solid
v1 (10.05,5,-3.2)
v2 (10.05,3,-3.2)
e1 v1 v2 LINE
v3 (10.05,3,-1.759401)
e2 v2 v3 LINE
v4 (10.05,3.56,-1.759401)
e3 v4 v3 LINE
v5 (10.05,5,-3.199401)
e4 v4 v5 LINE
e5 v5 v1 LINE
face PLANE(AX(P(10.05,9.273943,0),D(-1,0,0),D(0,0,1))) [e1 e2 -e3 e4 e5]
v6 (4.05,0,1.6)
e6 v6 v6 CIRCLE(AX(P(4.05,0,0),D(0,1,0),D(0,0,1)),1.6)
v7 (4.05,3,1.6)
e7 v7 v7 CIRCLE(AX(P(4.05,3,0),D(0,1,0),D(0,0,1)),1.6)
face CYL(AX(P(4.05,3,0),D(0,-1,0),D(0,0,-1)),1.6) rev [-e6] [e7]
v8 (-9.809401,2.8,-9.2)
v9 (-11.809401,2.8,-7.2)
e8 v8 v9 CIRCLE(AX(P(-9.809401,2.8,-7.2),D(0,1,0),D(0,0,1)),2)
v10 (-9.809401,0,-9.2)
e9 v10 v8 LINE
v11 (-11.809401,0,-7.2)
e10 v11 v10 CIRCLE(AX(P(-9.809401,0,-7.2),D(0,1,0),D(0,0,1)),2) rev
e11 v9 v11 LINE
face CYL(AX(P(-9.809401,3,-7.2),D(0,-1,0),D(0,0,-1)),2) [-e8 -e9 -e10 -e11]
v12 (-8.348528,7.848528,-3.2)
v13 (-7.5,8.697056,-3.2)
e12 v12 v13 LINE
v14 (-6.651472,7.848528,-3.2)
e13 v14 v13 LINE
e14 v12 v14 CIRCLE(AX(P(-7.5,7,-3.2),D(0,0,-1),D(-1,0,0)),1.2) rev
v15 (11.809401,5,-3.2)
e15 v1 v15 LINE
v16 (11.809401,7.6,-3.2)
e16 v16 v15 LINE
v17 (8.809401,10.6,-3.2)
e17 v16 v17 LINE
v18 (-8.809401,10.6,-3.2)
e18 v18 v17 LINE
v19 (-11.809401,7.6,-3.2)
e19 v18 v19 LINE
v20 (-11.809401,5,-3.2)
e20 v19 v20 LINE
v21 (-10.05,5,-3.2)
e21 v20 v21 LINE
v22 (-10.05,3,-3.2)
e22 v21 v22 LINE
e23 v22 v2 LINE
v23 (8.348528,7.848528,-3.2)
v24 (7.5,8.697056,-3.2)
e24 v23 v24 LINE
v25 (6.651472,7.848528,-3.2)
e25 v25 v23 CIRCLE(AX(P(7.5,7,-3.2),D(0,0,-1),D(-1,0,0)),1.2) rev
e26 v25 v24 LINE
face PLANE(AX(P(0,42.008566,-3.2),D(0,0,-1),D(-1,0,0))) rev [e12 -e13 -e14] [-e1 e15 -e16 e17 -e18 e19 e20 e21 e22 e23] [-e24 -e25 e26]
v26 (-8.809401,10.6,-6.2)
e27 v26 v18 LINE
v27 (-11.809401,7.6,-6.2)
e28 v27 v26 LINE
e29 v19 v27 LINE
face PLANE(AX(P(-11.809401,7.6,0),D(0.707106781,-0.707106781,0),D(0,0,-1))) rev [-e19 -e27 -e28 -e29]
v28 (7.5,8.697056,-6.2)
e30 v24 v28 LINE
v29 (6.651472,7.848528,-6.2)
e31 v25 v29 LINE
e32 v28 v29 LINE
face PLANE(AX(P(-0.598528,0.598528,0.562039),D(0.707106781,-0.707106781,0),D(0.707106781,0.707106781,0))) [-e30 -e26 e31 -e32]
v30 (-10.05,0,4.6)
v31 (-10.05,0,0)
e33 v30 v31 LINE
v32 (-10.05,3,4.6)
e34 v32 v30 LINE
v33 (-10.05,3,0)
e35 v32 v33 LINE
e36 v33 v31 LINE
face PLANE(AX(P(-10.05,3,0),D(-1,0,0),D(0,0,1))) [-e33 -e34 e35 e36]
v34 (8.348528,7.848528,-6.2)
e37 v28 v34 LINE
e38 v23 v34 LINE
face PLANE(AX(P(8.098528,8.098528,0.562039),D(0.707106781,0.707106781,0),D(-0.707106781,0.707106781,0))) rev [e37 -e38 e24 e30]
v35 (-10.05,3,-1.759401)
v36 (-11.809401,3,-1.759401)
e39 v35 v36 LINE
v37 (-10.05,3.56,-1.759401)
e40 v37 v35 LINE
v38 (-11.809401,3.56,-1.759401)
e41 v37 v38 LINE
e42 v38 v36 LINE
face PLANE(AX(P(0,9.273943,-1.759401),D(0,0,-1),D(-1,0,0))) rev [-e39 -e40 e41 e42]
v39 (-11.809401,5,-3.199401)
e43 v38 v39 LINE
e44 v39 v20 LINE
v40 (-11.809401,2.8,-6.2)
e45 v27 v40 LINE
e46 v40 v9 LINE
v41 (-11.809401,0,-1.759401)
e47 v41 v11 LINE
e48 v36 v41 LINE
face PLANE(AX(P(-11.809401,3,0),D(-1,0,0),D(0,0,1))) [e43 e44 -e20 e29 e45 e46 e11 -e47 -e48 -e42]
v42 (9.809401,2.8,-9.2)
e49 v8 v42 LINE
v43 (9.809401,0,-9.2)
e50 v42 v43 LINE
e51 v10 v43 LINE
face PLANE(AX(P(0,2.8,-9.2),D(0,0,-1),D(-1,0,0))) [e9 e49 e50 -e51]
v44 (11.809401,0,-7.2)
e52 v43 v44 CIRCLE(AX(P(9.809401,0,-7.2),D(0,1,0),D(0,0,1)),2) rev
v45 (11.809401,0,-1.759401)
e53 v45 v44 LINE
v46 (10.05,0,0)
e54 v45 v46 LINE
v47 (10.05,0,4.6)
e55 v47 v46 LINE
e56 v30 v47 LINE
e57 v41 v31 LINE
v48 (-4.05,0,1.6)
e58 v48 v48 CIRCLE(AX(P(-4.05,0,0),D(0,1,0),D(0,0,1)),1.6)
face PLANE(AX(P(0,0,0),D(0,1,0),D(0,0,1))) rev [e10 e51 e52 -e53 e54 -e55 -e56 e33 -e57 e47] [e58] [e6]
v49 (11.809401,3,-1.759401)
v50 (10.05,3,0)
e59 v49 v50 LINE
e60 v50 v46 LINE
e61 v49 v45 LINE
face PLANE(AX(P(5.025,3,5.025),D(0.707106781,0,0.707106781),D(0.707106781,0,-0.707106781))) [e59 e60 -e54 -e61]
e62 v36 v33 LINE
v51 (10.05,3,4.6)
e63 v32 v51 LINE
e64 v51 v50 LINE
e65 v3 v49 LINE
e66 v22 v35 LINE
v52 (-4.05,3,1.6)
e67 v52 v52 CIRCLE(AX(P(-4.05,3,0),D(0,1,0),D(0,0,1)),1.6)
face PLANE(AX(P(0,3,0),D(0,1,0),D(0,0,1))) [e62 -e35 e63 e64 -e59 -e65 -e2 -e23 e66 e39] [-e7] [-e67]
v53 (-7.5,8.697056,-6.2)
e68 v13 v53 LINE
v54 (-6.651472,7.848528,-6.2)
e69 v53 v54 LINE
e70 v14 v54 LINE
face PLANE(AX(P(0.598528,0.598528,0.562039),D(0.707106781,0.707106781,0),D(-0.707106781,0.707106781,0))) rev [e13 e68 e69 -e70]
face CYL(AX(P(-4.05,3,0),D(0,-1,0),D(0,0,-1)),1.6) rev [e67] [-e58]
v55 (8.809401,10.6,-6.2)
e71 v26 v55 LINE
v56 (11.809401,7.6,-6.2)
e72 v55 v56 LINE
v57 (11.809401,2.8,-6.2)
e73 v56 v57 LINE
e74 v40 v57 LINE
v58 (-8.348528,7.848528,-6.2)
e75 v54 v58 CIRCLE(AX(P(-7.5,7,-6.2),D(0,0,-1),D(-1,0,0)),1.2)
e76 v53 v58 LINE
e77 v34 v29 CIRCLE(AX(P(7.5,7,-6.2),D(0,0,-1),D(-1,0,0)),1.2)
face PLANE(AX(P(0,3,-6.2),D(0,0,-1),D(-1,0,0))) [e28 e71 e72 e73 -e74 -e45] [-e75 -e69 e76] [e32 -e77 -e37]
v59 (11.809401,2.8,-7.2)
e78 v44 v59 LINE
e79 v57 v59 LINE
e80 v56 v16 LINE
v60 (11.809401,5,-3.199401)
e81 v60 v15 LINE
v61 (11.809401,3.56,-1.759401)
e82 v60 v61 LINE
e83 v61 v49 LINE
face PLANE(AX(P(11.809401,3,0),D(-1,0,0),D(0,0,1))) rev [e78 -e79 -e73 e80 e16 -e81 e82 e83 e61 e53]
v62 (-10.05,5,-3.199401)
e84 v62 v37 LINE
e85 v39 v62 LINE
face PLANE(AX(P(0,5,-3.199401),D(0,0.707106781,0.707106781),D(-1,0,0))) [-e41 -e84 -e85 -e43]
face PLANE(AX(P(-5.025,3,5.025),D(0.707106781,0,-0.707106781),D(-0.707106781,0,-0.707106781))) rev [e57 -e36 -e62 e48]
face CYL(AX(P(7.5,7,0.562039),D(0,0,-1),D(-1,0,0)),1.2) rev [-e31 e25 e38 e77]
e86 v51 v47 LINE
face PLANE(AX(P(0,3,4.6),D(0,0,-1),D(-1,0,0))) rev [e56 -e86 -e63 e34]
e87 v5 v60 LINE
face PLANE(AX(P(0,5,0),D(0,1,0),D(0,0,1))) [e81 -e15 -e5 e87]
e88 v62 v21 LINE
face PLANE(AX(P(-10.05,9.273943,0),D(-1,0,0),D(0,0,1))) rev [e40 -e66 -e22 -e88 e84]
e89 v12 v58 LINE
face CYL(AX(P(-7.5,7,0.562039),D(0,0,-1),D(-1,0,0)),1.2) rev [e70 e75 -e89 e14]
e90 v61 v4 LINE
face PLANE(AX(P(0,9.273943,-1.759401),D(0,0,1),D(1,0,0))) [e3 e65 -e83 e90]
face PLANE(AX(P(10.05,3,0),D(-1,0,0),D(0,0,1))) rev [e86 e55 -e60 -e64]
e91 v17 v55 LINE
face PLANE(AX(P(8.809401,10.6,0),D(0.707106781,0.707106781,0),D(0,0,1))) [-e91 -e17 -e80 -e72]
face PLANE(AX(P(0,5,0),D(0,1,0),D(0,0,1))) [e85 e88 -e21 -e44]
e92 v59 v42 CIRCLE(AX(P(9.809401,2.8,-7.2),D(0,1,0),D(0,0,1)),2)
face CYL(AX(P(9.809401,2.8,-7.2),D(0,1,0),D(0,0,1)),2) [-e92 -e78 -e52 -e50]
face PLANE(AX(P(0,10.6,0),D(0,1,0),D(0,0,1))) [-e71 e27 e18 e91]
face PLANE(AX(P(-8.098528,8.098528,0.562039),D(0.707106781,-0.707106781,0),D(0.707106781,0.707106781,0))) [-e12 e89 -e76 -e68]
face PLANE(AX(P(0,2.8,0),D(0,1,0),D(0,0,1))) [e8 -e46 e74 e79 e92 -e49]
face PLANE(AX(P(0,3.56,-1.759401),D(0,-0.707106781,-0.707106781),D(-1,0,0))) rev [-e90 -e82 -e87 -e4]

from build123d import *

# Parameters (mm, degrees)
SKETCH1_R               = 3.2
BOSS_EXTRUDE1_DEPTH     = 3
SKETCH1_3_R             = 3.2
SKETCH1_3_R_2           = 1.6
BOSS_EXTRUDE2_DEPTH     = 3
BOSS_EXTRUDE3_OUTLINE_W = 23.618802154
BOSS_EXTRUDE3_OUTLINE_H = 3
BOSS_EXTRUDE3_DEPTH     = 10.6
SKETCH3_R               = 1.2
CUT_EXTRUDE4_DEPTH      = 3
SKETCH1_7_W             = 1.759401077
SKETCH1_7_H             = 1.440598923
BOSS_EXTRUDE5_DEPTH     = 5
CHAMFER1_SIZE           = 1.44
CHAMFER2_SIZE           = 3
BOSS_EXTRUDE6_DEPTH     = 2.8
FILLET1_R               = 2


# Read off the part's stored shape, not the designer's step: Boss-Extrude3
with BuildPart() as part:
    # Sketch1 → Boss-Extrude1 (new body)
    with BuildSketch(Plane(origin=(0, 0, 0), x_dir=(1, 0, 0), z_dir=(0, 1, 0))):
        Polygon((11.809401077, 3.2), (10.05, 3.2), (10.05, 6.2), (-10.05, 6.2), (-10.05, 3.2), (-11.809401077, 3.2), (-11.809401077, 1.759401077), (-10.05, 0), (-10.05, -4.6), (10.05, -4.6), (10.05, 0), (11.809401077, 1.759401077), align=None)
        with Locations(Location((-4.05, 0, 0), (0, 0, 270))):
            Circle(SKETCH1_R, mode=Mode.SUBTRACT)
        with Locations(Location((4.05, 0, 0), (0, 0, 270))):
            Circle(SKETCH1_R, mode=Mode.SUBTRACT)
    extrude(amount=BOSS_EXTRUDE1_DEPTH)

    # Sketch1<3> → Boss-Extrude2 (add)
    # profile 1 of 2: a face of its own
    with BuildSketch(Plane(origin=(0, 0, 0), x_dir=(1, 0, 0), z_dir=(0, 1, 0))):
        with Locations((-4.05, 0)):
            Circle(SKETCH1_3_R)
        with Locations(Location((-4.05, 0, 0), (0, 0, 270))):
            Circle(SKETCH1_3_R_2, mode=Mode.SUBTRACT)
    # profile 2 of 2: a face of its own
    with BuildSketch(Plane(origin=(0, 0, 0), x_dir=(1, 0, 0), z_dir=(0, 1, 0))):
        with Locations((4.05, 0)):
            Circle(SKETCH1_3_R)
        with Locations(Location((4.05, 0, 0), (0, 0, 270))):
            Circle(SKETCH1_3_R_2, mode=Mode.SUBTRACT)
    extrude(amount=BOSS_EXTRUDE2_DEPTH)

    # Boss-Extrude3 outline → Boss-Extrude3 (add)
    with BuildSketch(Plane(origin=(0, 0, 0), x_dir=(1, 0, 0), z_dir=(0, 1, 0))):
        with Locations((0, 4.7)):
            Rectangle(BOSS_EXTRUDE3_OUTLINE_W, BOSS_EXTRUDE3_OUTLINE_H)
    extrude(amount=BOSS_EXTRUDE3_DEPTH)

    # Sketch3 → Cut-Extrude4 (cut)
    with BuildSketch(Plane(origin=(0, 0, -6.2), x_dir=(-1, 0, 0), z_dir=(0, 0, -1))):
        with Locations((-7.5, 7)):
            Circle(SKETCH3_R)
        with Locations((7.5, 7)):
            Circle(SKETCH3_R)
        with BuildLine():
            Line((-6.651471863, 7.848528137), (-7.5, 8.697056275))
            Line((-7.5, 8.697056275), (-8.348528137, 7.848528137))
            ThreePointArc((-8.348528137, 7.848528137), (-7.5, 8.2), (-6.651471863, 7.848528137))
        make_face()
        with BuildLine():
            Line((8.348528137, 7.848528137), (7.5, 8.697056275))
            Line((7.5, 8.697056275), (6.651471863, 7.848528137))
            ThreePointArc((6.651471863, 7.848528137), (7.5, 8.2), (8.348528137, 7.848528137))
        make_face()
    extrude(amount=-CUT_EXTRUDE4_DEPTH, mode=Mode.SUBTRACT)

    # Sketch1<7> → Boss-Extrude5 (add)
    with BuildSketch(Plane(origin=(0, 0, 0), x_dir=(1, 0, 0), z_dir=(0, 1, 0))):
        with Locations((-10.929700539, 2.479700539)):
            Rectangle(SKETCH1_7_W, SKETCH1_7_H)
        with Locations((10.929700539, 2.479700539)):
            Rectangle(SKETCH1_7_W, SKETCH1_7_H)
    extrude(amount=BOSS_EXTRUDE5_DEPTH)

    # Chamfer1
    chamfer1_edges = [part.edges().sort_by_distance(p)[0] for p in [
        (-10.929700538, 5, -1.759401077),
        (10.929700538, 5, -1.759401077),
    ]]
    chamfer(chamfer1_edges, length=CHAMFER1_SIZE)

    # Chamfer2
    chamfer2_edges = [part.edges().sort_by_distance(p)[0] for p in [
        (-11.809401077, 10.6, -4.7),
        (11.809401077, 10.6, -4.7),
    ]]
    chamfer(chamfer2_edges, length=CHAMFER2_SIZE)

    # Sketch1<8> → Boss-Extrude6 (add)
    with BuildSketch(Plane(origin=(0, 0, 0), x_dir=(1, 0, 0), z_dir=(0, 1, 0))):
        Polygon((-11.809401077, 9.2), (-11.809401077, 6.2), (-10.05, 6.2), (10.05, 6.2), (11.809401077, 6.2), (11.809401077, 9.2), align=None)
    extrude(amount=BOSS_EXTRUDE6_DEPTH)

    # Fillet1
    fillet1_edges = [part.edges().sort_by_distance(p)[0] for p in [
        (11.809401077, 1.4, -9.2),
        (-11.809401077, 1.4, -9.2),
    ]]
    fillet(fillet1_edges, radius=FILLET1_R)


solid = part.part
